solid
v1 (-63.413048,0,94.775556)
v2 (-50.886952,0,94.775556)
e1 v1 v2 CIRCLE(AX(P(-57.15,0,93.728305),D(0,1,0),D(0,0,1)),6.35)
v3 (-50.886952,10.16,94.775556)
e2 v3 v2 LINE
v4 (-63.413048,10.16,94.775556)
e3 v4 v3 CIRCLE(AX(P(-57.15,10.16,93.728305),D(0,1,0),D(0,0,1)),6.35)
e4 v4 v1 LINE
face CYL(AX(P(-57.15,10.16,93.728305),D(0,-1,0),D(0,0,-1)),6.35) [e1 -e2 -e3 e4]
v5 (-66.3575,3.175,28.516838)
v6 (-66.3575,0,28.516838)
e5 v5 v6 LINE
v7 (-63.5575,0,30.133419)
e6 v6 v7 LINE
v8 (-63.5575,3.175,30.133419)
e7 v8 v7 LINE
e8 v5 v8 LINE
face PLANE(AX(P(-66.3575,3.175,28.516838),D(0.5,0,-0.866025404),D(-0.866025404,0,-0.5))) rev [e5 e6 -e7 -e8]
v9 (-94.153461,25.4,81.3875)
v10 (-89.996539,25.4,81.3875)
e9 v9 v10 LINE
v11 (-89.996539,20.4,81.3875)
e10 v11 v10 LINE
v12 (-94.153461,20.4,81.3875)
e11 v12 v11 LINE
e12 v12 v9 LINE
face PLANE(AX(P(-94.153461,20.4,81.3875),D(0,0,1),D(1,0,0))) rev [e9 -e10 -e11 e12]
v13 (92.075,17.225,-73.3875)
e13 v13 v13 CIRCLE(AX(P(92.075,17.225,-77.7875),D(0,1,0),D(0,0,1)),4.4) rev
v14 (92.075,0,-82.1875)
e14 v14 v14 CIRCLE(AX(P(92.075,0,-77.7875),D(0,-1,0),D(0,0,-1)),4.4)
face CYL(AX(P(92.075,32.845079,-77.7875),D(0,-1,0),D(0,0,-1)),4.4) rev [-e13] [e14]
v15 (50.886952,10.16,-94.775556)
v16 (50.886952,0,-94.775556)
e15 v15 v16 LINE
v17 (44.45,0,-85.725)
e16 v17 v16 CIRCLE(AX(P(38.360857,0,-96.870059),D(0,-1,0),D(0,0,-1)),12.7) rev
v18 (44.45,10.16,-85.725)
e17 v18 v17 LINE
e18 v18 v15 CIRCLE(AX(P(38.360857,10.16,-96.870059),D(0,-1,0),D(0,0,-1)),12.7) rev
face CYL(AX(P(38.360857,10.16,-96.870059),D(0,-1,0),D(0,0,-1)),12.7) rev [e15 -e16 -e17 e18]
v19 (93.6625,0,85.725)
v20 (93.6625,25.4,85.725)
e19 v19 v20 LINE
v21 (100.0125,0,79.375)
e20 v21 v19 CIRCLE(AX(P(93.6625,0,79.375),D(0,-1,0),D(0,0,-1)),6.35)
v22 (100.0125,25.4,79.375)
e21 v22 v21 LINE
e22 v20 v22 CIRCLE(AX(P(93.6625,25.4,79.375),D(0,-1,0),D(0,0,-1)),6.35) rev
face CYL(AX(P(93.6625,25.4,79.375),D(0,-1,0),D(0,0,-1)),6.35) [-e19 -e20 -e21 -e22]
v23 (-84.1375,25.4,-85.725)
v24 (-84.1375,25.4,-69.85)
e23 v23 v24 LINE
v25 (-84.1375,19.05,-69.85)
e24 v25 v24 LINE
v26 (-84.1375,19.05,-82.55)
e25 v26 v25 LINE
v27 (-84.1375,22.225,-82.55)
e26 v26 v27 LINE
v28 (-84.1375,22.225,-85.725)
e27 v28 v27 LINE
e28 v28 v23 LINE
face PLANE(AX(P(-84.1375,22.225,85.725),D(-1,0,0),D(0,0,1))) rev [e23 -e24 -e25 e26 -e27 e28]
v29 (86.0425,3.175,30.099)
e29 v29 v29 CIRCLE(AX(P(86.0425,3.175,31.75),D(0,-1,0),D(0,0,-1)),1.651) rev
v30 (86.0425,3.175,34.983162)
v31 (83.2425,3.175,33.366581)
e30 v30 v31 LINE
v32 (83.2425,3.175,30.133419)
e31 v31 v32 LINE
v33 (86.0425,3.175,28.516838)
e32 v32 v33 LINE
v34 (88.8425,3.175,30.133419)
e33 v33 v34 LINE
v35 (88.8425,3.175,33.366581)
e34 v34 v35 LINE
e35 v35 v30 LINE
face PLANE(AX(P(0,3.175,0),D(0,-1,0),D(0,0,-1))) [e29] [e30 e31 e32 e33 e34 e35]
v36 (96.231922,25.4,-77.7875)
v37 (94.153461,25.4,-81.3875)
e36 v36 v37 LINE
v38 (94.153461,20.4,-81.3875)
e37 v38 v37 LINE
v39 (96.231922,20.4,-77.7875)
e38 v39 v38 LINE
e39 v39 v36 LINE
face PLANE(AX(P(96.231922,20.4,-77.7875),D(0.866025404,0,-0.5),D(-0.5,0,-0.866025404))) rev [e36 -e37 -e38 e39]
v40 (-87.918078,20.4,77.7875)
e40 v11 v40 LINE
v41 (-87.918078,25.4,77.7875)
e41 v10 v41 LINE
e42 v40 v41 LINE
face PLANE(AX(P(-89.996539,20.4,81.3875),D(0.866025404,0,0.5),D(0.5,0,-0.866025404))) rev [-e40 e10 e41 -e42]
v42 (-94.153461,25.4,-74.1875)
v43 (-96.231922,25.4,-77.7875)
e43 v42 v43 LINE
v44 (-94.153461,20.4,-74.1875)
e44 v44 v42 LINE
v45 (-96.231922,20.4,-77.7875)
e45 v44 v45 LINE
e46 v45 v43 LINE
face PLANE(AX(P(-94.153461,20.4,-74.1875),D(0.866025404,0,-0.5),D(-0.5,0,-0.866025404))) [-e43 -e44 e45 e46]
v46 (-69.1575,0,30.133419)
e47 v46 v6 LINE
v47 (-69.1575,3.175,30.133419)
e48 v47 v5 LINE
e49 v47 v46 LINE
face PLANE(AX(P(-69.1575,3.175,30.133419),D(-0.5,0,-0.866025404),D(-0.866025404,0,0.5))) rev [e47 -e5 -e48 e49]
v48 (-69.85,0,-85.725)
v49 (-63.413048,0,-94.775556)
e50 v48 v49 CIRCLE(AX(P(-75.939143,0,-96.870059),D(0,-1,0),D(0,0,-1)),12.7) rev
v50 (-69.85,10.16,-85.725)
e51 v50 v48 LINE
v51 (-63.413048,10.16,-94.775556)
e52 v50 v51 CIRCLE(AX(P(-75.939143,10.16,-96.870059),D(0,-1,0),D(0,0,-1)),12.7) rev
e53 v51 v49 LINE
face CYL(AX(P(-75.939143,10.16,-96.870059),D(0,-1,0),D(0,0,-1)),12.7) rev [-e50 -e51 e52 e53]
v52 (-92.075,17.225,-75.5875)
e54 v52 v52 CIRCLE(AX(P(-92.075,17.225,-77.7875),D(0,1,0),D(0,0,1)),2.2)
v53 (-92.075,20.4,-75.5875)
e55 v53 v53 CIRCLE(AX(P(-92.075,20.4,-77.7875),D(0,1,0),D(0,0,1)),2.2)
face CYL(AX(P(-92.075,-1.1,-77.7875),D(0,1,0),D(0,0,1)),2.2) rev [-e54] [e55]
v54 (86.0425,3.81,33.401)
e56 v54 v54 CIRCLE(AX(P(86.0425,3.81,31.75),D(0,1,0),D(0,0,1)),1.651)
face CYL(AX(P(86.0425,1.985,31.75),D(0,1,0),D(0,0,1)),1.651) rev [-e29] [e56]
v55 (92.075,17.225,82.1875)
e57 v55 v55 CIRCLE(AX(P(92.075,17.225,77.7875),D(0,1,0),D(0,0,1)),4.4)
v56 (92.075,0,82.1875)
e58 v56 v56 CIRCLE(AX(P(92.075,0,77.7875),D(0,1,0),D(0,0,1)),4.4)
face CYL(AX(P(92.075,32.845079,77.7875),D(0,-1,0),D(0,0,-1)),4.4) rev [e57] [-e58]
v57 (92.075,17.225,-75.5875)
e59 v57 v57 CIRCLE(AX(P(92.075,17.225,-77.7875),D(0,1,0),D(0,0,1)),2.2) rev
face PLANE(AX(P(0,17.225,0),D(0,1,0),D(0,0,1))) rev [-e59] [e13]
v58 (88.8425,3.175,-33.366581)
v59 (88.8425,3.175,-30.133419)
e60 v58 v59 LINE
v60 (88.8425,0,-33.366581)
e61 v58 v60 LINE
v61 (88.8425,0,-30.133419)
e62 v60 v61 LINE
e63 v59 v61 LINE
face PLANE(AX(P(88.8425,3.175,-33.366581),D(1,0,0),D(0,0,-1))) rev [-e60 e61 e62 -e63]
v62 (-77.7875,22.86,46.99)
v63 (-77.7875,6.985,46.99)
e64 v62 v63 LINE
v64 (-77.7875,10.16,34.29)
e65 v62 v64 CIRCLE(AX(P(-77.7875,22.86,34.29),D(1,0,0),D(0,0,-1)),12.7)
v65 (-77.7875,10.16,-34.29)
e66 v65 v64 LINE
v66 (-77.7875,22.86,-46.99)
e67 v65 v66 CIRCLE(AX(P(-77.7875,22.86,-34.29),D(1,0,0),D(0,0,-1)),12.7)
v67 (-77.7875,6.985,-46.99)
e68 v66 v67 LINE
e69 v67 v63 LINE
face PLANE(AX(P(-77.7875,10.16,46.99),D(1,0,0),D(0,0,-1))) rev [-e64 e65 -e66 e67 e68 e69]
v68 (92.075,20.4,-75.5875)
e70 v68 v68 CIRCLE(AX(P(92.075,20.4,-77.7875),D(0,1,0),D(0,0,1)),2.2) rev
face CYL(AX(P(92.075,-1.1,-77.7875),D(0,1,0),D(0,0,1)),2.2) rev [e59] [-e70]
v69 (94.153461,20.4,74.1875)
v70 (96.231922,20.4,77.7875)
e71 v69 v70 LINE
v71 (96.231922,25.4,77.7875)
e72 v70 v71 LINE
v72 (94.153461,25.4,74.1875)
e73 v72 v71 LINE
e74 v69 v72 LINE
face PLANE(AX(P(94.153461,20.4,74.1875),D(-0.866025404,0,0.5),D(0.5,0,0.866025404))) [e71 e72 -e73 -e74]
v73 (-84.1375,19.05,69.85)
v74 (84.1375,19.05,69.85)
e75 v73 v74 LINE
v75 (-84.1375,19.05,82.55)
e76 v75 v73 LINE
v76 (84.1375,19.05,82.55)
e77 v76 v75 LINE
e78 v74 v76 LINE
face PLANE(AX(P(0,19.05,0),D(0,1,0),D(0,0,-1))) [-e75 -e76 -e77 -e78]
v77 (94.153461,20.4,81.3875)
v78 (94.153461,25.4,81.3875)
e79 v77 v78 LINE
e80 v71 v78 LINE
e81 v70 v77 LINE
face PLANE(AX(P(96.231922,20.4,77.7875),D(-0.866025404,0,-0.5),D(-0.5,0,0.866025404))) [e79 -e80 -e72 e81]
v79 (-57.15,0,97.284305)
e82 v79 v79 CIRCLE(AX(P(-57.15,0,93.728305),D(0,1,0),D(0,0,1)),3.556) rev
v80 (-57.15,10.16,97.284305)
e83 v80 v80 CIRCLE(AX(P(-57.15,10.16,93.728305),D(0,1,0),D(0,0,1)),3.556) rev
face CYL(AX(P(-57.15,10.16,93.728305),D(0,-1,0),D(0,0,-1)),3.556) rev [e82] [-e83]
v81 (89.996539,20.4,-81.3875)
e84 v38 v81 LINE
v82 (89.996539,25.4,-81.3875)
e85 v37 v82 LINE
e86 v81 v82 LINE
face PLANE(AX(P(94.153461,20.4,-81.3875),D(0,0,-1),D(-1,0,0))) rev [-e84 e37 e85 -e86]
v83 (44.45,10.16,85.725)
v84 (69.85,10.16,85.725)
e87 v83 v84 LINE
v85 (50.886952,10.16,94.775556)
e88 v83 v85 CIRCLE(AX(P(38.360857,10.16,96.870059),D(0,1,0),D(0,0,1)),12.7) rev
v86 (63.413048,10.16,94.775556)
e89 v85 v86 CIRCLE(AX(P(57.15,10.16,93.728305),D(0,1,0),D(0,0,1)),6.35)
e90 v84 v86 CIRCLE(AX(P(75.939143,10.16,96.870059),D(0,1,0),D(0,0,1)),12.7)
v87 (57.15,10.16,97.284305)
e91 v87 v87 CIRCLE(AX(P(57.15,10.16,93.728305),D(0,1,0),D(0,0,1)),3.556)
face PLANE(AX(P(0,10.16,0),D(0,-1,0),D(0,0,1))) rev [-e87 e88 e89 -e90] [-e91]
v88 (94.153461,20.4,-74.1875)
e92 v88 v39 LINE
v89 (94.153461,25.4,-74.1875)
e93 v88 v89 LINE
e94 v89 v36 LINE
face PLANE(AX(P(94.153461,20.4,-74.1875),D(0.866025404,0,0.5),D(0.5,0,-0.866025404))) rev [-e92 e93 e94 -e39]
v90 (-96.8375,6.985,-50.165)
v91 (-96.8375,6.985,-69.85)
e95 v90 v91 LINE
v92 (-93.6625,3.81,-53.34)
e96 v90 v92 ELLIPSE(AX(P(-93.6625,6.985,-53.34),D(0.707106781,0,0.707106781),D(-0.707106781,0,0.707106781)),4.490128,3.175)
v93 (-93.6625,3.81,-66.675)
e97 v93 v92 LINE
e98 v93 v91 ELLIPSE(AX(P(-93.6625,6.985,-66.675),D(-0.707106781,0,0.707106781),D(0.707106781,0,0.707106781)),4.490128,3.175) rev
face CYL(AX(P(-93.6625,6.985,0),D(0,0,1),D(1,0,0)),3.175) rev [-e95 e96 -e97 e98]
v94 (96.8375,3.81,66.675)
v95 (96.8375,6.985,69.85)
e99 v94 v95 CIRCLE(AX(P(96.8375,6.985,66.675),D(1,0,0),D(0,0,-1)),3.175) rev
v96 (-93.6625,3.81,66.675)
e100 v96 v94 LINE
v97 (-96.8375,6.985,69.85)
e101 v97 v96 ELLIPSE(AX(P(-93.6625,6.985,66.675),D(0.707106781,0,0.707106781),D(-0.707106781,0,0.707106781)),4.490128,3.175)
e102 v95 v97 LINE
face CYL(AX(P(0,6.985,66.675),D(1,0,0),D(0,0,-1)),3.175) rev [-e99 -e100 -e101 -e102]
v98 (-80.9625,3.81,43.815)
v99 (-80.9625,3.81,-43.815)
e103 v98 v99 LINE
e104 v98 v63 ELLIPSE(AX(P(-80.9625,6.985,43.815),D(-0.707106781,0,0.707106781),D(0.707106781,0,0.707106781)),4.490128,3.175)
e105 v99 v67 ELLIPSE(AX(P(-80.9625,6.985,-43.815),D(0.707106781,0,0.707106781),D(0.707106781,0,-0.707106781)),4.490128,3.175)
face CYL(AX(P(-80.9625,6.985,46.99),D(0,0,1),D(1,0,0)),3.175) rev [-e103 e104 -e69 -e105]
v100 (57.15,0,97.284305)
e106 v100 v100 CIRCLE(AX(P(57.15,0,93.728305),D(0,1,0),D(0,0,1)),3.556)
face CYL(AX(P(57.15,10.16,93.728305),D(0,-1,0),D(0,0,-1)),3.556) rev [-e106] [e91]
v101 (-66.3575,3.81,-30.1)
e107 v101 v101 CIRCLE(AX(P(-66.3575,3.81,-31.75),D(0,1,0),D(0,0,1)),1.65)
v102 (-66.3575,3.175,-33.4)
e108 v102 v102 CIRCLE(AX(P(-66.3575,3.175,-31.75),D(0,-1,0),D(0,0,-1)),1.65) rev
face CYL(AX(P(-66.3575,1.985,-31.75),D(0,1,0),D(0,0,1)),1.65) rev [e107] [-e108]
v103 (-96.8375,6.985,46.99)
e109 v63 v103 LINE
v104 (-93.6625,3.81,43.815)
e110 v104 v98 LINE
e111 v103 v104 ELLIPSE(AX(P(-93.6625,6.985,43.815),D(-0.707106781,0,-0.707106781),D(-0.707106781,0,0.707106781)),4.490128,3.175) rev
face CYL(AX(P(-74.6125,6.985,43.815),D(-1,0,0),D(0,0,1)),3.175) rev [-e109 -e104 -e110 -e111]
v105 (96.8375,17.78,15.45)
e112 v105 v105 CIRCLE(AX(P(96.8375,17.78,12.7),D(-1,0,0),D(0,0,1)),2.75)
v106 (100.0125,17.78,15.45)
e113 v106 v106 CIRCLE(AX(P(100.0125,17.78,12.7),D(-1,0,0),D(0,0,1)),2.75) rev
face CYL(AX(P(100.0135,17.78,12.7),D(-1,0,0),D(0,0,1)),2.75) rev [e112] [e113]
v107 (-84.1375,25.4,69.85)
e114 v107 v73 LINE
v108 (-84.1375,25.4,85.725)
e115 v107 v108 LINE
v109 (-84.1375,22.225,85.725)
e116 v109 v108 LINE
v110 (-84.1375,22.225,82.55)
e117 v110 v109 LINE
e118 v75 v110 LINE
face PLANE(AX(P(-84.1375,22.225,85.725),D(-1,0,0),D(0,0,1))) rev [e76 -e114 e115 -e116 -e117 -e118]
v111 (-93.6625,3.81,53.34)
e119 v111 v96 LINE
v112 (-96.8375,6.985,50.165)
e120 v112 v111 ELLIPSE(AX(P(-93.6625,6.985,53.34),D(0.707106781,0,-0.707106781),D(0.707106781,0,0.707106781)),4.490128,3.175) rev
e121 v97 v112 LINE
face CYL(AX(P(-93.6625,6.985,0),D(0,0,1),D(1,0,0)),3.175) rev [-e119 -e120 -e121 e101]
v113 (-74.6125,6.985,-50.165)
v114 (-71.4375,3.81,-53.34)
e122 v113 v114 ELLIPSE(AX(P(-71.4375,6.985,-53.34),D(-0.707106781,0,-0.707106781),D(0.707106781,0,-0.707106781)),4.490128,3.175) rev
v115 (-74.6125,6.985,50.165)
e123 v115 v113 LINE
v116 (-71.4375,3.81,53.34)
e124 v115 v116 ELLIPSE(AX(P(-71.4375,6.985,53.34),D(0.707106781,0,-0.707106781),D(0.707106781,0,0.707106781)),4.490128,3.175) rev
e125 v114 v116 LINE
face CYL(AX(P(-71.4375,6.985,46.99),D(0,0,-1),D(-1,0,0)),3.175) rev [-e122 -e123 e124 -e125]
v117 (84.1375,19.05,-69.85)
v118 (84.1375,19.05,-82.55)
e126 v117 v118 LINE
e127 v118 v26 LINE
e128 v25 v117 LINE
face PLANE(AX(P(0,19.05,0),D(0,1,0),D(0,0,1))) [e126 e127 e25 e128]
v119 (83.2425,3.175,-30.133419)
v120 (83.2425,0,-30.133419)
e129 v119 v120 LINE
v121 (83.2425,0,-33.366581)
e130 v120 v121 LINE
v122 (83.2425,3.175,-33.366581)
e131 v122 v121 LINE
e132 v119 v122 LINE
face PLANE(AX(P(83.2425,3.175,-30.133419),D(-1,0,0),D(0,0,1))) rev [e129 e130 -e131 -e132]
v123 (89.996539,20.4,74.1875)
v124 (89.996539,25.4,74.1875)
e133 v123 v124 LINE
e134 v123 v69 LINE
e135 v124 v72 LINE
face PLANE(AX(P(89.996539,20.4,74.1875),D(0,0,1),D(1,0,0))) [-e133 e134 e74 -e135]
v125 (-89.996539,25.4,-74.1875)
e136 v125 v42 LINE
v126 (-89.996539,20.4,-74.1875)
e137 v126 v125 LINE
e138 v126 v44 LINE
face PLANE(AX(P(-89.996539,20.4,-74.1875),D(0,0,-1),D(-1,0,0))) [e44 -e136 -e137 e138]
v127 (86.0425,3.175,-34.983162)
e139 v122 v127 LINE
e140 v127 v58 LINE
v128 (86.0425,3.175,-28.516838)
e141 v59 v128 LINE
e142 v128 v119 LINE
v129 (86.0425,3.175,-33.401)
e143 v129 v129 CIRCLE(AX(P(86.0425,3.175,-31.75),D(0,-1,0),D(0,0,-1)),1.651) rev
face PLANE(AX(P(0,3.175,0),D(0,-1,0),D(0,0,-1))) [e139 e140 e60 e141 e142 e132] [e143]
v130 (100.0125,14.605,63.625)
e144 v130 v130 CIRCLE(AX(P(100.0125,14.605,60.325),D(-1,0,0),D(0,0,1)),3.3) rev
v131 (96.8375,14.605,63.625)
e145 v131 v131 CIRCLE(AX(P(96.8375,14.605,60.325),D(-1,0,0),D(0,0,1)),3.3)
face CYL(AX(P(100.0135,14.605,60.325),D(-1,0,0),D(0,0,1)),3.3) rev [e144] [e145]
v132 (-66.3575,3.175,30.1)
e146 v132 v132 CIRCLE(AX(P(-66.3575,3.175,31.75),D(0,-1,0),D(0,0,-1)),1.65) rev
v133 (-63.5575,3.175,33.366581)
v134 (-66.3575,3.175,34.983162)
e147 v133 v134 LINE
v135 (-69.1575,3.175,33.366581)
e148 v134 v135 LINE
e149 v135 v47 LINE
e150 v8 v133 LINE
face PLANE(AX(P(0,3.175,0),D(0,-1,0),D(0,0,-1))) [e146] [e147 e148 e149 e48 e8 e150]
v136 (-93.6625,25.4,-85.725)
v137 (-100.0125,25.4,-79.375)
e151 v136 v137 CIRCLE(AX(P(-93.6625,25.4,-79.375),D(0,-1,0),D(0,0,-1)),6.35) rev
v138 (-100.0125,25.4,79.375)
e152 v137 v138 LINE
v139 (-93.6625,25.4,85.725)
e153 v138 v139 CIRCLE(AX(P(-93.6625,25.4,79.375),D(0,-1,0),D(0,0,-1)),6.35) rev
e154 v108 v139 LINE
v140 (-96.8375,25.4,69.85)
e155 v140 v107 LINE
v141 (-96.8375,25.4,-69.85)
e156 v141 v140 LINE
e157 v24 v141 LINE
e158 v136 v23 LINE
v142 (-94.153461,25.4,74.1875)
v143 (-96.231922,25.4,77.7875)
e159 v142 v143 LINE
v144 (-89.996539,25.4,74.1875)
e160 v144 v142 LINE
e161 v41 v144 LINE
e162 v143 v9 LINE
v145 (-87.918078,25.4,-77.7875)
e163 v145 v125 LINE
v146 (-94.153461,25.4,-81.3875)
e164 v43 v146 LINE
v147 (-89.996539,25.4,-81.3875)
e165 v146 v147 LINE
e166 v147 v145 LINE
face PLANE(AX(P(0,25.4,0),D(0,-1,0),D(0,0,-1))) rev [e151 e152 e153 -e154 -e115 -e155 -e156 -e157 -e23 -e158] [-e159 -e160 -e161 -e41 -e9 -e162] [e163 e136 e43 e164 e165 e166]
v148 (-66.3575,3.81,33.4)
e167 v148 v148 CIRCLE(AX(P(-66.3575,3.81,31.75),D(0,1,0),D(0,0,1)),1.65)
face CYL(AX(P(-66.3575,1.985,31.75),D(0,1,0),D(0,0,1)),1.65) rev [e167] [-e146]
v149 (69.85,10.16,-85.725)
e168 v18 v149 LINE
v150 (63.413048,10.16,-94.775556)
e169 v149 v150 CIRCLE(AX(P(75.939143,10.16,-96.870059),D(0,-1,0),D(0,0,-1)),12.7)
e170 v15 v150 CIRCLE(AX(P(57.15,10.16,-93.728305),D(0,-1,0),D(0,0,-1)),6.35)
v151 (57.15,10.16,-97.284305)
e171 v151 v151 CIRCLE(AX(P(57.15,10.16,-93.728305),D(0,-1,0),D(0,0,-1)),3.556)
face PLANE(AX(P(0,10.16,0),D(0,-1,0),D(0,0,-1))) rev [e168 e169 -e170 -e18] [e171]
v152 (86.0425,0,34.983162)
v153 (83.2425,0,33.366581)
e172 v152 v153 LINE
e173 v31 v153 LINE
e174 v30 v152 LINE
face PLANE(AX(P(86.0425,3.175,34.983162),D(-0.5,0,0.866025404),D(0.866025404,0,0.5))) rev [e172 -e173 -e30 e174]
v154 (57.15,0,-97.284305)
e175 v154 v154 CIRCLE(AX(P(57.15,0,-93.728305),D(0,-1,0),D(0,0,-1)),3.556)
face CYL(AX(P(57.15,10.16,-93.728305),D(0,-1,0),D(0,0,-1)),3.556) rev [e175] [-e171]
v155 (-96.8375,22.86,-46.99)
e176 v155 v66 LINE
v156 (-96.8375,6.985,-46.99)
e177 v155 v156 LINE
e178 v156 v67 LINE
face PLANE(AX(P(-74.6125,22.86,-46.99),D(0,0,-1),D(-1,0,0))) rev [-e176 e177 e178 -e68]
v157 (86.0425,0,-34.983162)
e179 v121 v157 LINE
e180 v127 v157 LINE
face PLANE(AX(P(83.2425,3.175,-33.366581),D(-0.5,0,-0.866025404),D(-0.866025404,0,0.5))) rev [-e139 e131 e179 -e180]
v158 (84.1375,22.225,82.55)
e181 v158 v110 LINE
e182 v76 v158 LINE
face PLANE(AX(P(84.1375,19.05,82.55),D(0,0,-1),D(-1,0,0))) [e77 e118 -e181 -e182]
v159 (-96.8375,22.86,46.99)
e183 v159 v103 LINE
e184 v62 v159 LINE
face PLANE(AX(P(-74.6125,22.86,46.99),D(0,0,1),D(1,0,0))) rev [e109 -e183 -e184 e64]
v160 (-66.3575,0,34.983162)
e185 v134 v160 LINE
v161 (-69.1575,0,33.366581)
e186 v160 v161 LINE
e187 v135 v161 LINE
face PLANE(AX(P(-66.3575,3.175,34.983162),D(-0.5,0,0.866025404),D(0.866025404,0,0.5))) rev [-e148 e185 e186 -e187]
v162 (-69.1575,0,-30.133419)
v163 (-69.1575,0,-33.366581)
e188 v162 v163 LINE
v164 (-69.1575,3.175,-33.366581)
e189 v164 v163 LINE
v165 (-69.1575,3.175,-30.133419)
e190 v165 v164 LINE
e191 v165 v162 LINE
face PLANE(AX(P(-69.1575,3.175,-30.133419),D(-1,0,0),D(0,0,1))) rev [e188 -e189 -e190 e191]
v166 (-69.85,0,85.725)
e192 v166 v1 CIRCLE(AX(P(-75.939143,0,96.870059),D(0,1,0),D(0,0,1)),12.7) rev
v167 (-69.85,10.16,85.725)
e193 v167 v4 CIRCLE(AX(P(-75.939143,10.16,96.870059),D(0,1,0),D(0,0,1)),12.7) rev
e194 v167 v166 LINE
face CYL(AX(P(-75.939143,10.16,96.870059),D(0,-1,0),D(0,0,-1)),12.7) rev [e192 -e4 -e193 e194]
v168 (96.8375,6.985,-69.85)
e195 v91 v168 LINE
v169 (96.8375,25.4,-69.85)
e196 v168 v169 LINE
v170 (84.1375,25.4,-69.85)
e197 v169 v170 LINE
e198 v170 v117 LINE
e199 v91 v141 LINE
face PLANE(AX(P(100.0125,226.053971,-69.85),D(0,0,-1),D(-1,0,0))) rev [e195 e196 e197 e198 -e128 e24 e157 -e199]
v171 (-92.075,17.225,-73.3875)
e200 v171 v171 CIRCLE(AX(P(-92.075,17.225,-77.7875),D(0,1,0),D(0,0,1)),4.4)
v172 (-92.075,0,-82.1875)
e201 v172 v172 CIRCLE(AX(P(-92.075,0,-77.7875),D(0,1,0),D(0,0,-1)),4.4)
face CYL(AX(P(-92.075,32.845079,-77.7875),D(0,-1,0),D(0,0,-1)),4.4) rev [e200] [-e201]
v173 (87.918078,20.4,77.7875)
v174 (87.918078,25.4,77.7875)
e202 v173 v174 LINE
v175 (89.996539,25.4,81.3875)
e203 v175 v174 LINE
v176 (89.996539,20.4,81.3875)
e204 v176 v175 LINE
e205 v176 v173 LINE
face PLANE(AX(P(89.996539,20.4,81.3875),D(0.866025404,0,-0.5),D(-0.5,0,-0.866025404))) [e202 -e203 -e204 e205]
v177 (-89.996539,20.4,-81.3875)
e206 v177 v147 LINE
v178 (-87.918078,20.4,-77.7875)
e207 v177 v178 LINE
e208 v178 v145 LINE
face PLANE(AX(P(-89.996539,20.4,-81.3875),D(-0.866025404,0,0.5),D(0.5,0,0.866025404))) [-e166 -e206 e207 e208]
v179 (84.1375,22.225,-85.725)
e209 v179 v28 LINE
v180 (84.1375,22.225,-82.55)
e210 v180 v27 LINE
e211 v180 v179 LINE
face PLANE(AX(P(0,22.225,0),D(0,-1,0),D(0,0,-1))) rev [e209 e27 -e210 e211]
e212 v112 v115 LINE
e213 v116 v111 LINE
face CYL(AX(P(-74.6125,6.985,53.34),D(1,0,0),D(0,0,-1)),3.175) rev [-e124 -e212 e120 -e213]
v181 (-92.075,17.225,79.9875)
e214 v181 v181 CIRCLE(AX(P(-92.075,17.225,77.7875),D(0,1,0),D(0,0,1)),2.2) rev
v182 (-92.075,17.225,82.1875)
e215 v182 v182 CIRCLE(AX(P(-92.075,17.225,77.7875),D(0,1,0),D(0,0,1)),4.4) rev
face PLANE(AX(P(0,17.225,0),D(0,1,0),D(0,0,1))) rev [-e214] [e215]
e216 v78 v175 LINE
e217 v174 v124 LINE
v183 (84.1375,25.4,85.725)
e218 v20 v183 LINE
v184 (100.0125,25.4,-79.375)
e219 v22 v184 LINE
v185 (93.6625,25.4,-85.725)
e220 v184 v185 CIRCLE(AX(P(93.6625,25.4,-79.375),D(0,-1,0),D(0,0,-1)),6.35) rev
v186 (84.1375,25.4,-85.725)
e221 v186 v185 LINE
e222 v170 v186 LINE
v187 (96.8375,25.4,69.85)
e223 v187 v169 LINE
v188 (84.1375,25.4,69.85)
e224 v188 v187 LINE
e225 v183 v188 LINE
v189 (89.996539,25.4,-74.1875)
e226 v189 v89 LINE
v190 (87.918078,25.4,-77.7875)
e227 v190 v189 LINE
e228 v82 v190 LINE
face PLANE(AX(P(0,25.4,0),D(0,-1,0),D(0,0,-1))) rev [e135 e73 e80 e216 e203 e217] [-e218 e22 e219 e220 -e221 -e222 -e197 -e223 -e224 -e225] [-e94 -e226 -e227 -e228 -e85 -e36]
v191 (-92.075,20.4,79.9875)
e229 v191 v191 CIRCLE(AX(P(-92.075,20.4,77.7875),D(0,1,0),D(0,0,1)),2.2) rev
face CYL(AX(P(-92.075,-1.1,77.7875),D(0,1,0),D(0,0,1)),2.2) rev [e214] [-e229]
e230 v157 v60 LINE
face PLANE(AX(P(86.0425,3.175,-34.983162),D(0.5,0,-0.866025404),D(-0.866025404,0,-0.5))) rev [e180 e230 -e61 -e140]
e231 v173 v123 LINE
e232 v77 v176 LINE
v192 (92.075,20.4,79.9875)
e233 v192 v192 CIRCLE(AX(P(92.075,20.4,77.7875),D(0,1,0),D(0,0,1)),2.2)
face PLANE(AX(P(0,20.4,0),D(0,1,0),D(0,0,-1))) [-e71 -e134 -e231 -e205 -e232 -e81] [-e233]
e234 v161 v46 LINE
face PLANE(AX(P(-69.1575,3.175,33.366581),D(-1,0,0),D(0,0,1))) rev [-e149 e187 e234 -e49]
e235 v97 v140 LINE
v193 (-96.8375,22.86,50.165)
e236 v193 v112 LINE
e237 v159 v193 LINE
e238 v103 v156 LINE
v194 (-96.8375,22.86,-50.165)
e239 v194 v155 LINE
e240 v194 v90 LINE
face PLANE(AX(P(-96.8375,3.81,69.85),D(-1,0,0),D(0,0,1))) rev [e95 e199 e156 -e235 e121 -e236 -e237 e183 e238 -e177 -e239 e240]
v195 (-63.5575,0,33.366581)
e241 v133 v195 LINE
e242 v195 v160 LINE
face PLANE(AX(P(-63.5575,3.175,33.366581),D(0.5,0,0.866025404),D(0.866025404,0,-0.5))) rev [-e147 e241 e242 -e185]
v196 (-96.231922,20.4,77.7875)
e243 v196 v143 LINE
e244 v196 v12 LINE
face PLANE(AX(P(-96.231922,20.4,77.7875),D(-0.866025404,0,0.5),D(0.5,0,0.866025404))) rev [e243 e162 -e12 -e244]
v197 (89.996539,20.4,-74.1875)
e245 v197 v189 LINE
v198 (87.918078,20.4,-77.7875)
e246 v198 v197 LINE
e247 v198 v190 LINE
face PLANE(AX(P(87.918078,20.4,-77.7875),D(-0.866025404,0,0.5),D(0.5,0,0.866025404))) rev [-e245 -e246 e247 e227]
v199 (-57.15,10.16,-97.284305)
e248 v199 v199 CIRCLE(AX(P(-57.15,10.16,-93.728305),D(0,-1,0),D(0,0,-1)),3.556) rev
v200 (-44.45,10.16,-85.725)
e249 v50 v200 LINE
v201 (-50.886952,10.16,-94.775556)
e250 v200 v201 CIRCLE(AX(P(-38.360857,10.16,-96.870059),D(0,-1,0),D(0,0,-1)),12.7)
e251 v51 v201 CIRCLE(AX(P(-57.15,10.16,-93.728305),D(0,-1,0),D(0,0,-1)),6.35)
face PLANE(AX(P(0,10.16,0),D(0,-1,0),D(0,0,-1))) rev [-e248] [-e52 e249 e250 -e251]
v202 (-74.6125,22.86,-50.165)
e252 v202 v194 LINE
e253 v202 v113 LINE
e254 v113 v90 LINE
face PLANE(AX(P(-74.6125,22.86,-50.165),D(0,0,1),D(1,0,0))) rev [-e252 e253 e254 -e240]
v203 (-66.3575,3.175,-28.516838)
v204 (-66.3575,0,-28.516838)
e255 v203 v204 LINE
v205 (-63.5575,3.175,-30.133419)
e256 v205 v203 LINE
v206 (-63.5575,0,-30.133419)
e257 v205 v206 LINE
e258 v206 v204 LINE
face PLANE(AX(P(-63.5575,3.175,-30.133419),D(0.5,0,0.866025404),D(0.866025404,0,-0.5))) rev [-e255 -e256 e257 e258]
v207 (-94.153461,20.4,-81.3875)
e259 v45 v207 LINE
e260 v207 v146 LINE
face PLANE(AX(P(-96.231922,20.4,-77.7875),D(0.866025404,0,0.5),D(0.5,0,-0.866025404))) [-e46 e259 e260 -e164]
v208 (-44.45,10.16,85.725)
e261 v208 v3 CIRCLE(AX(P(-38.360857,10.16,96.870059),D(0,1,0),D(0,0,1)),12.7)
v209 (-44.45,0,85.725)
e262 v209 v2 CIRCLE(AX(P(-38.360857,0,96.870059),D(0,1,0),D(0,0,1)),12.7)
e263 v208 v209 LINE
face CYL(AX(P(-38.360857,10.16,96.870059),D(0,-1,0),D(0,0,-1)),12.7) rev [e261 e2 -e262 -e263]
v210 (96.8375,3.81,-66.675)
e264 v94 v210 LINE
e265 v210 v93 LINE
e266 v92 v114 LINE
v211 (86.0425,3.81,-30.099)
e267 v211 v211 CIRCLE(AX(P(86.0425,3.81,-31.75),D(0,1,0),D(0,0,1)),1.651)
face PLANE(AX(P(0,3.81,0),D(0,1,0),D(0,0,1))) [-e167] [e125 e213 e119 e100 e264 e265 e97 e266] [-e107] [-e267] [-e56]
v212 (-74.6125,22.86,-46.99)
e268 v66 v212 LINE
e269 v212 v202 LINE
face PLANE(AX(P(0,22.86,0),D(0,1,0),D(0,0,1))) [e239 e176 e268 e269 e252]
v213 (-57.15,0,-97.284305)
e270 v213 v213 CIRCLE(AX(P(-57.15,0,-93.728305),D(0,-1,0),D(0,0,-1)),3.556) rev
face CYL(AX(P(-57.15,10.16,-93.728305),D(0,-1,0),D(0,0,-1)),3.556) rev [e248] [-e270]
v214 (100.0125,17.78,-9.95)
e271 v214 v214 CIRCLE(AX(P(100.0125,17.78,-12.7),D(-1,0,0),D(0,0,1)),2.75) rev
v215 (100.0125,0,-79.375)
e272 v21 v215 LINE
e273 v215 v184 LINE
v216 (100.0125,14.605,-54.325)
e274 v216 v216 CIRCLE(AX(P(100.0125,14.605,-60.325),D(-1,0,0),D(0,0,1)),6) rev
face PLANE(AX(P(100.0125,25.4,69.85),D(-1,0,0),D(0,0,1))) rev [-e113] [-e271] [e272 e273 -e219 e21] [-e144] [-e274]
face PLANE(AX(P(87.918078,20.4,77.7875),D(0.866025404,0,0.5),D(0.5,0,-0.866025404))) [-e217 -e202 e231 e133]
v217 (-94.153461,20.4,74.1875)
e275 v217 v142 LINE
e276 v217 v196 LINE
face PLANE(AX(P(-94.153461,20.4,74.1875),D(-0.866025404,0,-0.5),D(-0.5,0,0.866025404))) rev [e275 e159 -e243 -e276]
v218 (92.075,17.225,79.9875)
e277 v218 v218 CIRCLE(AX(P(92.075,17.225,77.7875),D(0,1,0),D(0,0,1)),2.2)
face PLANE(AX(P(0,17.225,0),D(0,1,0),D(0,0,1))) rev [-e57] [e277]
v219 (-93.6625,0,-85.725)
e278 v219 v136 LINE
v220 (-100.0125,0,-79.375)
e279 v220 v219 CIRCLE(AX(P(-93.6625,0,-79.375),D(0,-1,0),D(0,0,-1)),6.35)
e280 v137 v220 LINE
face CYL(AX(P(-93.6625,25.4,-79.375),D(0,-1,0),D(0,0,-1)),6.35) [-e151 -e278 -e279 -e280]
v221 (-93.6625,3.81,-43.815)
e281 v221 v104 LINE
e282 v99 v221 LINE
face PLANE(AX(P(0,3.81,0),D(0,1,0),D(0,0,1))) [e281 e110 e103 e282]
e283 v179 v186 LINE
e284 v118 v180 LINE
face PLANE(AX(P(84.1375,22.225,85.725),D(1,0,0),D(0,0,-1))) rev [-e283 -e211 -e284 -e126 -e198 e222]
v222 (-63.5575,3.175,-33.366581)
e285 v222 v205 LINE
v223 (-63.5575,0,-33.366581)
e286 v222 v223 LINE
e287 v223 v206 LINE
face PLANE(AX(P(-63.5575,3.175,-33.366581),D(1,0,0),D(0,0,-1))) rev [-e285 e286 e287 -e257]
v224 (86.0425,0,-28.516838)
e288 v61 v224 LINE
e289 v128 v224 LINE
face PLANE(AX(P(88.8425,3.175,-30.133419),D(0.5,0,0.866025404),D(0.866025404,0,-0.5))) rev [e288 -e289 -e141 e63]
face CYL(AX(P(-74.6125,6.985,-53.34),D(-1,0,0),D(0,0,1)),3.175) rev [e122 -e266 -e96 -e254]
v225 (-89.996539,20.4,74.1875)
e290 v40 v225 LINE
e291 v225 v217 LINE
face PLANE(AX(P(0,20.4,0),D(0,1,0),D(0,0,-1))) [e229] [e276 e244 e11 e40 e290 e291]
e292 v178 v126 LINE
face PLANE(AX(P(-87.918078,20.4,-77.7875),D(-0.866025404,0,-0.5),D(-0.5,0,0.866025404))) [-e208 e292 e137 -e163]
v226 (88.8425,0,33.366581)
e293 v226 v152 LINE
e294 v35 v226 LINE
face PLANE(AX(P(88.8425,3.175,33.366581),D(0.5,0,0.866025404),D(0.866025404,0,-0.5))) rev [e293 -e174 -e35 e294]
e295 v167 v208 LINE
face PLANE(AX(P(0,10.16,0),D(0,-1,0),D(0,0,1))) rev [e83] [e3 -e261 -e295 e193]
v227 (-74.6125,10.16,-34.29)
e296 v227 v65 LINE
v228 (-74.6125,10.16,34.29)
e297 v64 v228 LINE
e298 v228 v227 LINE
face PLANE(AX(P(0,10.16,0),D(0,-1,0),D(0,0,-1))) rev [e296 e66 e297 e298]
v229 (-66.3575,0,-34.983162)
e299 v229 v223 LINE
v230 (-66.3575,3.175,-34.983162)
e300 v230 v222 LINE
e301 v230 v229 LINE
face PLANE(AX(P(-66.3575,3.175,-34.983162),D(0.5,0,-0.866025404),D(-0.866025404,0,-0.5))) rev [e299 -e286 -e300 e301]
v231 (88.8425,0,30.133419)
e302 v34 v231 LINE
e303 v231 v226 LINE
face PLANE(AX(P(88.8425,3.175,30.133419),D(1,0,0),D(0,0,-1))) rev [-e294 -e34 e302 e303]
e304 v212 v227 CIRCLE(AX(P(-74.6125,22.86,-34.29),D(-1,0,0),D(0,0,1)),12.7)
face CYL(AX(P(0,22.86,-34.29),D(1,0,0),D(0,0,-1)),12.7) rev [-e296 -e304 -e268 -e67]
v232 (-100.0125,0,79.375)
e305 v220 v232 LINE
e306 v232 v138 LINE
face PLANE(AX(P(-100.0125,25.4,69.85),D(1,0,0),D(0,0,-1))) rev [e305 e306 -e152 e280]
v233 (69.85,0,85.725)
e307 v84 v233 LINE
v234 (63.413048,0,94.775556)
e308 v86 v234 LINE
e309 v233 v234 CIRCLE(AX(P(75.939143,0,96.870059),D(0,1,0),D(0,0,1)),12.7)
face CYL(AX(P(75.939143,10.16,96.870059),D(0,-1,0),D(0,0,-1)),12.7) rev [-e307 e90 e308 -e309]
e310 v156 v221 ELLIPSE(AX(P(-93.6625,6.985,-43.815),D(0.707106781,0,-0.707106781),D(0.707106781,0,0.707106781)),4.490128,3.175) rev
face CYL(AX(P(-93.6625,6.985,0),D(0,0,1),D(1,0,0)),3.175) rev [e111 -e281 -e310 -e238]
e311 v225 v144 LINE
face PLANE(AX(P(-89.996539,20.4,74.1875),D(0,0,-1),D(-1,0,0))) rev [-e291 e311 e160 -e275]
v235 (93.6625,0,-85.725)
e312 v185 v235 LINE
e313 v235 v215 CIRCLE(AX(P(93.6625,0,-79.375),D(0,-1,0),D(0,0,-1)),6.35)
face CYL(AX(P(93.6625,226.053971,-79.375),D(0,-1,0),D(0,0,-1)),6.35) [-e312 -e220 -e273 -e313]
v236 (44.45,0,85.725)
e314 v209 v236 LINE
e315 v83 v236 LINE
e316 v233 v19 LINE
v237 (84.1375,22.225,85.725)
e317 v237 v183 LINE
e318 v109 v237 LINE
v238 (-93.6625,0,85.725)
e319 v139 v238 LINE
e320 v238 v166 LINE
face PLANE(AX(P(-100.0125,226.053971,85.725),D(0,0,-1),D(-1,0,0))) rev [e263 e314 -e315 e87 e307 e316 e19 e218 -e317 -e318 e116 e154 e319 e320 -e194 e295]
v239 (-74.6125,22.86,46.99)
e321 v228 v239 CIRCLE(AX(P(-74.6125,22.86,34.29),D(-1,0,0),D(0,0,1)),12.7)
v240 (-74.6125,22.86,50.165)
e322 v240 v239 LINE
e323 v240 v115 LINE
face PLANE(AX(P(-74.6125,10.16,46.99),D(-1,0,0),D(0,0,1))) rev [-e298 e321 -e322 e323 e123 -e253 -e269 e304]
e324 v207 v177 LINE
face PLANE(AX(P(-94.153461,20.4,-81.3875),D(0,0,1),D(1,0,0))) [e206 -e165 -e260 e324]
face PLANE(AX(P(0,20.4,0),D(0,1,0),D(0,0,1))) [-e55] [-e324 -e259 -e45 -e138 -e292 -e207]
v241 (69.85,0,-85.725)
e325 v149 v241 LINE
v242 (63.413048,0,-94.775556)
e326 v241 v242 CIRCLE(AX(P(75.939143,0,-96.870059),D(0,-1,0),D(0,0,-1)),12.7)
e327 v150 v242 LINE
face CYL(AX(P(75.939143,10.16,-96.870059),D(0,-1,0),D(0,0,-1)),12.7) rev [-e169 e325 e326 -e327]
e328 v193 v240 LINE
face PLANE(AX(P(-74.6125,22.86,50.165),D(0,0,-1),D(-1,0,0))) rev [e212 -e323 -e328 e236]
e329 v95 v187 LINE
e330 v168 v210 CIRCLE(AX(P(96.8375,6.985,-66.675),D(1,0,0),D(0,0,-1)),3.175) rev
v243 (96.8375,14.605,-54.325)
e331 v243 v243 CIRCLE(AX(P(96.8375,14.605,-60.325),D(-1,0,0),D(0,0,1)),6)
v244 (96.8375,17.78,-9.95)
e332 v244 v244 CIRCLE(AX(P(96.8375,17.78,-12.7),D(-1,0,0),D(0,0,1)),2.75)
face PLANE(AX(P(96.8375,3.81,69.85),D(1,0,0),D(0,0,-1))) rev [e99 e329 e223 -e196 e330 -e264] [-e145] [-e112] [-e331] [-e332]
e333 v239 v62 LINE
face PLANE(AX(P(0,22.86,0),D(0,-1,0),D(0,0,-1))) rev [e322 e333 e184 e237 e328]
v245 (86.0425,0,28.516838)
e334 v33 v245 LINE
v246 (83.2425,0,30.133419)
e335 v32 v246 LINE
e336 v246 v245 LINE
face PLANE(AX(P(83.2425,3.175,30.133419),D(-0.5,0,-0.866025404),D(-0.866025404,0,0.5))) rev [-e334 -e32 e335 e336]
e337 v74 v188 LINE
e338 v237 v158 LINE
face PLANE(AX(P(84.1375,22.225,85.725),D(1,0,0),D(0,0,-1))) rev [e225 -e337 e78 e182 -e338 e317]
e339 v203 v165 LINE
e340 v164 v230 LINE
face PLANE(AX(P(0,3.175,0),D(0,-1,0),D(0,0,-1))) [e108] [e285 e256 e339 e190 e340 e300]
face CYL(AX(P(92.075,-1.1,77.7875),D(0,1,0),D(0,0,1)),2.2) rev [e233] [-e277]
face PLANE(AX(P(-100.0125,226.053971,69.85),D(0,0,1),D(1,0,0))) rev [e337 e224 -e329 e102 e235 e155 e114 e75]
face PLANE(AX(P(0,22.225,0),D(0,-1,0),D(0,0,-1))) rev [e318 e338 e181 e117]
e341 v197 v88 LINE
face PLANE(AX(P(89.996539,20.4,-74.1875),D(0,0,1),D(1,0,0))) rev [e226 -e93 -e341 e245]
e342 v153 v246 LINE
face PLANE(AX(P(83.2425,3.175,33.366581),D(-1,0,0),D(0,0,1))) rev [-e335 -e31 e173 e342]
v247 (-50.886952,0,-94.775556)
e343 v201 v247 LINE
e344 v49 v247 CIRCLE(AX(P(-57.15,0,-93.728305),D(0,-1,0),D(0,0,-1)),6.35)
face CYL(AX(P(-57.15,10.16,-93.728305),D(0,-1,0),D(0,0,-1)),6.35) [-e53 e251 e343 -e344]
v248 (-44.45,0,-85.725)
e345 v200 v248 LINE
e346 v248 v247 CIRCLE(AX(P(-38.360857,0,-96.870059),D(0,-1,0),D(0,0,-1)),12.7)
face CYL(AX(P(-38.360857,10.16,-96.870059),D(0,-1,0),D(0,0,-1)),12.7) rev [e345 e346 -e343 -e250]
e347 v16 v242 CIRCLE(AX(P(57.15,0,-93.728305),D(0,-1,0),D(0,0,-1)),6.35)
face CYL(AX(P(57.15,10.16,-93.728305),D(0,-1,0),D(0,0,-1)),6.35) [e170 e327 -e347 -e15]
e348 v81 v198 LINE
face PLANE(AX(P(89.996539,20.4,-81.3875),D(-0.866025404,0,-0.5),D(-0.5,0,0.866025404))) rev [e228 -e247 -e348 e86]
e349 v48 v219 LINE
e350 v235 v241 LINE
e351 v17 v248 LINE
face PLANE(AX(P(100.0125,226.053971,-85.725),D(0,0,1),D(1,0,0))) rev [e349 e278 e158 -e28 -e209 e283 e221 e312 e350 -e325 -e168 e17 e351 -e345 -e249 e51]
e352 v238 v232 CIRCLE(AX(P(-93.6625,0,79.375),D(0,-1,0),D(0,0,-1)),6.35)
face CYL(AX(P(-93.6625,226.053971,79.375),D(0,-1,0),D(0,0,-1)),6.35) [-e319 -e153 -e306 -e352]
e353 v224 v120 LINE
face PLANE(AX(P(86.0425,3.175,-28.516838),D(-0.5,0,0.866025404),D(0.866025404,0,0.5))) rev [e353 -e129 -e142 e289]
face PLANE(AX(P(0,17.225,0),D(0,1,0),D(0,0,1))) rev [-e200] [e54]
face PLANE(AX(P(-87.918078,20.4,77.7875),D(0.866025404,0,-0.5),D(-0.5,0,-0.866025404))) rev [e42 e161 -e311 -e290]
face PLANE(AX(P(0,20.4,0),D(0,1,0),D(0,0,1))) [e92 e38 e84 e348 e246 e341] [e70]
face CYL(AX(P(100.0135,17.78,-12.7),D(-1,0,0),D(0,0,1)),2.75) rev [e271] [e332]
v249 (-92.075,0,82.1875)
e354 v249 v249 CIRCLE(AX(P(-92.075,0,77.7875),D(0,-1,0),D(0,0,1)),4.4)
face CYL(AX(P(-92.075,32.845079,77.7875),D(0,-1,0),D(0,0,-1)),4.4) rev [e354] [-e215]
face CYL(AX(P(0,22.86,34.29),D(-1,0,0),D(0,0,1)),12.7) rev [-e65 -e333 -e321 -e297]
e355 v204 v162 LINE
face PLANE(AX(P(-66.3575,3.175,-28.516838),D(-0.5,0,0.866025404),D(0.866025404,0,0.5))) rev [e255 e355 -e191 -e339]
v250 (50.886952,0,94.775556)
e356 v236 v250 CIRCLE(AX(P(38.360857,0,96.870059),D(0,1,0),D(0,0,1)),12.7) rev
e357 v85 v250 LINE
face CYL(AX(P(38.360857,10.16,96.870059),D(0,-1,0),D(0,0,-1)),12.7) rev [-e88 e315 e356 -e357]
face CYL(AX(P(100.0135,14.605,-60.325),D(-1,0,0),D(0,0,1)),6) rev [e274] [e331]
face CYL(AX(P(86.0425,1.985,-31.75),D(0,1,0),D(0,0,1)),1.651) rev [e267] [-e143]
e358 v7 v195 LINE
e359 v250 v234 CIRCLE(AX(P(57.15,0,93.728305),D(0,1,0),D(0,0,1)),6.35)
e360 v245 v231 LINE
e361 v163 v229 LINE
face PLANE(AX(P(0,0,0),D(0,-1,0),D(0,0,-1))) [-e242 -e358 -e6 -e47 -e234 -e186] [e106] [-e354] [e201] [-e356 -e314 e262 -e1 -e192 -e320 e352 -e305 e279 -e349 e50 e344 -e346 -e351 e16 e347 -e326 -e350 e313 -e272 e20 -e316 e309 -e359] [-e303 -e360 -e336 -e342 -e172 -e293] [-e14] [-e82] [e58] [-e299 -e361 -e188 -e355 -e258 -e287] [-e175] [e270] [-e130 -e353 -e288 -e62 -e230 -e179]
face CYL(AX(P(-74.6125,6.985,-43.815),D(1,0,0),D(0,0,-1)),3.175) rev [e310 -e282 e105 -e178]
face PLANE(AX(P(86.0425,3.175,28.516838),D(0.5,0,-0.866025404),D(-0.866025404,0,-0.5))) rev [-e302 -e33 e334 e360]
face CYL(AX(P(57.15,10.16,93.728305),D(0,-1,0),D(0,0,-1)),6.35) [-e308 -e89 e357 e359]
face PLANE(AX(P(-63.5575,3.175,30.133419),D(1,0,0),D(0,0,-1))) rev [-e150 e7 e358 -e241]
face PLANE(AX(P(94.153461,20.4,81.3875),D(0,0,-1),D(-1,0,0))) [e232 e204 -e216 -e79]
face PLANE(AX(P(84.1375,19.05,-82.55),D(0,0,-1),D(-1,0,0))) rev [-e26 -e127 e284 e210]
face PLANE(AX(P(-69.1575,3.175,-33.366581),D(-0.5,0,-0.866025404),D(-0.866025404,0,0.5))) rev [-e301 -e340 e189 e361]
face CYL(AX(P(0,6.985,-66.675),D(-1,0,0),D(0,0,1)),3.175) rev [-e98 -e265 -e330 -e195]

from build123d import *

# Parameters (mm, degrees)
SKETCH18_W              = 200.025
SKETCH18_H              = 139.7
BOSS_EXTRUDE6_DEPTH     = 25.4
SKETCH20_W              = 193.675
SKETCH20_H              = 139.7
CUT_EXTRUDE6_DEPTH      = 21.59
SKETCH22_W              = 200.025
SKETCH22_H              = 15.875
BOSS_EXTRUDE7_DEPTH     = 25.4
SKETCH23_W              = 200.025
SKETCH23_H              = 15.875
BOSS_EXTRUDE8_DEPTH     = 25.4
SKETCH24_W              = 168.275
SKETCH24_H              = 171.45
CUT_EXTRUDE7_DEPTH      = 3.175
SKETCH28_W              = 168.275
SKETCH28_H              = 12.7
CUT_EXTRUDE10_DEPTH     = 3.175
SKETCH31_R              = 1.65
SKETCH31_R_2            = 1.651
CUT_EXTRUDE15_DEPTH     = 1.825
CUT_EXTRUDE17_DEPTH     = 3.175
SKETCH39_R              = 2.2
CUT_EXTRUDE18_DEPTH     = 26.5
CUT_EXTRUDE20_DEPTH     = 5
SKETCH40_R              = 4.4
CUT_EXTRUDE19_DEPTH     = 17.225
SKETCH47_R              = 3.556
BOSS_EXTRUDE14_DEPTH    = 10.16
MIRROR6_COPY_1_SKETCH_R = 2.2
MIRROR6_COPY_1_DEPTH    = 26.5
MIRROR6_COPY_2_DEPTH    = 5
MIRROR6_COPY_3_SKETCH_R = 4.4
MIRROR6_COPY_3_DEPTH    = 17.225
CUT_EXTRUDE21_REACH     = 224.285
SKETCH48_R              = 6
SKETCH48_R_2            = 3.3
SKETCH48_R_3            = 2.75
SKETCH49_W              = 3.175
SKETCH49_H              = 93.98
BOSS_EXTRUDE15_DEPTH    = 6.35
SKETCH50_W              = 22.225
SKETCH50_H              = 3.175
BOSS_EXTRUDE16_DEPTH    = 19.05
FILLET1_R               = 6.35
FILLET2_R               = 3.175
FILLET3_R               = 12.7


with BuildPart() as part:
    # Sketch18 → Boss-Extrude6 (new body)
    with BuildSketch(Plane(origin=(0, 0, 0), x_dir=(1, 0, 0), z_dir=(0, 1, 0))):
        Rectangle(SKETCH18_W, SKETCH18_H)
    extrude(amount=BOSS_EXTRUDE6_DEPTH)

    # Sketch20 → Cut-Extrude6 (cut)
    with BuildSketch(Plane(origin=(0, 25.4, 0), x_dir=(1, 0, 0), z_dir=(0, 1, 0))):
        Rectangle(SKETCH20_W, SKETCH20_H)
    extrude(amount=-CUT_EXTRUDE6_DEPTH, mode=Mode.SUBTRACT)

    # Sketch22 → Boss-Extrude7 (add)
    with BuildSketch(Plane(origin=(0, 0, 0), x_dir=(1, 0, 0), z_dir=(0, 1, 0))):
        with Locations((0, -77.7875)):
            Rectangle(SKETCH22_W, SKETCH22_H)
    extrude(amount=BOSS_EXTRUDE7_DEPTH)

    # Sketch23 → Boss-Extrude8 (add)
    with BuildSketch(Plane(origin=(0, 0, 0), x_dir=(1, 0, 0), z_dir=(0, 1, 0))):
        with Locations((0, 77.7875)):
            Rectangle(SKETCH23_W, SKETCH23_H)
    extrude(amount=BOSS_EXTRUDE8_DEPTH)

    # Sketch24 → Cut-Extrude7 (cut)
    with BuildSketch(Plane(origin=(0, 25.4, 0), x_dir=(1, 0, 0), z_dir=(0, 1, 0))):
        Rectangle(SKETCH24_W, SKETCH24_H)
    extrude(amount=-CUT_EXTRUDE7_DEPTH, mode=Mode.SUBTRACT)

    # Sketch28 → Cut-Extrude10 (cut)
    with BuildSketch(Plane(origin=(0, 22.225, 0), x_dir=(1, 0, 0), z_dir=(0, 1, 0))):
        with Locations((0, 76.2)):
            Rectangle(SKETCH28_W, SKETCH28_H)
    cut_extrude10 = extrude(amount=-CUT_EXTRUDE10_DEPTH, mode=Mode.SUBTRACT)

    # Mirror5: Cut-Extrude10 across plane
    add(cut_extrude10.mirror(Plane.XY), mode=Mode.SUBTRACT)

    # Sketch31 → Cut-Extrude15 (cut)
    with BuildSketch(Plane(origin=(0, 3.81, 0), x_dir=(1, 0, 0), z_dir=(0, 1, 0))):
        with Locations(Location((-66.3575, 31.75, 0), (0, 0, 270))):
            Circle(SKETCH31_R)
        with Locations(Location((86.0425, 31.75, 0), (0, 0, 270))):
            Circle(SKETCH31_R_2)
        with Locations(Location((86.0425, -31.75, 0), (0, 0, 270))):
            Circle(SKETCH31_R_2)
        with Locations(Location((-66.3575, -31.75, 0), (0, 0, 270))):
            Circle(SKETCH31_R)
    extrude(amount=-CUT_EXTRUDE15_DEPTH, mode=Mode.SUBTRACT)

    # Sketch33 → Cut-Extrude17 (cut)
    with BuildSketch(Plane.XZ):
        Polygon((-63.5575, -33.366580754), (-63.5575, -30.133419246), (-66.3575, -28.516838493), (-69.1575, -30.133419246), (-69.1575, -33.366580754), (-66.3575, -34.983161507), align=None)
        Polygon((88.8425, -33.366580754), (88.8425, -30.133419246), (86.0425, -28.516838493), (83.2425, -30.133419246), (83.2425, -33.366580754), (86.0425, -34.983161507), align=None)
        Polygon((-63.5575, 33.366580754), (-66.3575, 34.983161507), (-69.1575, 33.366580754), (-69.1575, 30.133419246), (-66.3575, 28.516838493), (-63.5575, 30.133419246), align=None)
        Polygon((83.2425, 33.366580754), (83.2425, 30.133419246), (86.0425, 28.516838493), (88.8425, 30.133419246), (88.8425, 33.366580754), (86.0425, 34.983161507), align=None)
    extrude(amount=-CUT_EXTRUDE17_DEPTH, mode=Mode.SUBTRACT)

    # Sketch39 → Cut-Extrude18 (cut)
    with BuildSketch(Plane(origin=(0, 25.4, 0), x_dir=(1, 0, 0), z_dir=(0, 1, 0))):
        with Locations(Location((92.075, 77.7875, 0), (0, 0, 270))):
            Circle(SKETCH39_R)
    cut_extrude18 = extrude(amount=-CUT_EXTRUDE18_DEPTH, mode=Mode.SUBTRACT)

    # Sketch41 → Cut-Extrude20 (cut)
    with BuildSketch(Plane(origin=(0, 25.4, 0), x_dir=(1, 0, 0), z_dir=(0, 1, 0))):
        Polygon((89.996539031, 81.3875), (87.918078062, 77.7875), (89.996539031, 74.1875), (94.153460969, 74.1875), (96.231921938, 77.7875), (94.153460969, 81.3875), align=None)
    cut_extrude20 = extrude(amount=-CUT_EXTRUDE20_DEPTH, mode=Mode.SUBTRACT)

    # Sketch40 → Cut-Extrude19 (cut)
    with BuildSketch(Plane.XZ):
        with Locations(Location((92.075, -77.7875, 0), (0, 0, 270))):
            Circle(SKETCH40_R)
    cut_extrude19 = extrude(amount=-CUT_EXTRUDE19_DEPTH, mode=Mode.SUBTRACT)

    # Mirror3: Cut-Extrude18, Cut-Extrude20, Cut-Extrude19 across plane
    add(cut_extrude18.mirror(Plane.XY), mode=Mode.SUBTRACT)
    add(cut_extrude20.mirror(Plane.XY), mode=Mode.SUBTRACT)
    add(cut_extrude19.mirror(Plane.XY), mode=Mode.SUBTRACT)

    # Sketch47 → Boss-Extrude14 (add)
    # profile 1 of 2: a face of its own
    with BuildSketch(Plane.XZ):
        with BuildLine():
            Line((-44.45, -85.725), (-69.85, -85.725))
            ThreePointArc((-69.85, -85.725), (-65.589750808, -89.50934655), (-63.41304754, -94.775556275))
            ThreePointArc((-63.41304754, -94.775556275), (-61.253197141, -98.574568708), (-57.15, -100.078304866))
            ThreePointArc((-57.15, -100.078304866), (-53.046802859, -98.574568708), (-50.88695246, -94.775556275))
            ThreePointArc((-50.88695246, -94.775556275), (-48.710249192, -89.50934655), (-44.45, -85.725))
        make_face()
        with Locations(Location((-57.15, -93.728304866, 0), (0, 0, 270))):
            Circle(SKETCH47_R, mode=Mode.SUBTRACT)
    # profile 2 of 2: a face of its own
    with BuildSketch(Plane.XZ):
        with BuildLine():
            Line((69.85, -85.725), (44.45, -85.725))
            ThreePointArc((44.45, -85.725), (48.710249192, -89.50934655), (50.88695246, -94.775556275))
            ThreePointArc((50.88695246, -94.775556275), (53.046802859, -98.574568708), (57.15, -100.078304866))
            ThreePointArc((57.15, -100.078304866), (61.253197141, -98.574568708), (63.41304754, -94.775556275))
            ThreePointArc((63.41304754, -94.775556275), (65.589750808, -89.50934655), (69.85, -85.725))
        make_face()
        with Locations(Location((57.15, -93.728304866, 0), (0, 0, 270))):
            Circle(SKETCH47_R, mode=Mode.SUBTRACT)
    boss_extrude14 = extrude(amount=-BOSS_EXTRUDE14_DEPTH)

    # Mirror4: Boss-Extrude14 across plane
    add(boss_extrude14.mirror(Plane.XY))

    # Mirror6: Cut-Extrude18, Cut-Extrude20, Cut-Extrude19 across plane
    add(cut_extrude18.mirror(Plane(origin=(0, 0, 0), x_dir=(0, 0, 1), z_dir=(1, 0, 0))), mode=Mode.SUBTRACT)
    add(cut_extrude20.mirror(Plane(origin=(0, 0, 0), x_dir=(0, 0, 1), z_dir=(1, 0, 0))), mode=Mode.SUBTRACT)
    add(cut_extrude19.mirror(Plane(origin=(0, 0, 0), x_dir=(0, 0, 1), z_dir=(1, 0, 0))), mode=Mode.SUBTRACT)

    # Mirror6 copy 1 sketch → Mirror6 copy 1 (cut)
    with BuildSketch(Plane(origin=(0, 25.4, 0), x_dir=(-1, 0, 0), z_dir=(0, 1, 0))):
        with Locations(Location((92.075, 77.7875, 0), (0, 0, 270))):
            Circle(MIRROR6_COPY_1_SKETCH_R)
    extrude(amount=-MIRROR6_COPY_1_DEPTH, mode=Mode.SUBTRACT)

    # Mirror6 copy 2 sketch → Mirror6 copy 2 (cut)
    with BuildSketch(Plane(origin=(0, 25.4, 0), x_dir=(-1, 0, 0), z_dir=(0, 1, 0))):
        Polygon((89.996539031, 81.3875), (87.918078062, 77.7875), (89.996539031, 74.1875), (94.153460969, 74.1875), (96.231921938, 77.7875), (94.153460969, 81.3875), align=None)
    extrude(amount=-MIRROR6_COPY_2_DEPTH, mode=Mode.SUBTRACT)

    # Mirror6 copy 3 sketch → Mirror6 copy 3 (cut)
    with BuildSketch(Plane(origin=(0, 0, 0), x_dir=(-1, 0, 0), z_dir=(0, -1, 0))):
        with Locations(Location((92.075, -77.7875, 0), (0, 0, 270))):
            Circle(MIRROR6_COPY_3_SKETCH_R)
    extrude(amount=-MIRROR6_COPY_3_DEPTH, mode=Mode.SUBTRACT)

    # Sketch48 → Cut-Extrude21 (cut, up to next)
    with BuildSketch(Plane.ZY.offset(-96.8375), mode=Mode.PRIVATE) as cut_extrude21_sk1:
        with Locations((-60.325, 14.605)):
            Circle(SKETCH48_R)
    cut_extrude21_tool1 = extrude(cut_extrude21_sk1.sketch, amount=-CUT_EXTRUDE21_REACH, mode=Mode.PRIVATE) & part.part
    # Sketch48 → Cut-Extrude21 (cut, up to next)
    with BuildSketch(Plane.ZY.offset(-96.8375), mode=Mode.PRIVATE) as cut_extrude21_sk2:
        with Locations((60.325, 14.605)):
            Circle(SKETCH48_R_2)
    cut_extrude21_tool2 = extrude(cut_extrude21_sk2.sketch, amount=-CUT_EXTRUDE21_REACH, mode=Mode.PRIVATE) & part.part
    # Sketch48 → Cut-Extrude21 (cut, up to next)
    with BuildSketch(Plane.ZY.offset(-96.8375), mode=Mode.PRIVATE) as cut_extrude21_sk3:
        with Locations((-12.7, 17.78)):
            Circle(SKETCH48_R_3)
    cut_extrude21_tool3 = extrude(cut_extrude21_sk3.sketch, amount=-CUT_EXTRUDE21_REACH, mode=Mode.PRIVATE) & part.part
    # Sketch48 → Cut-Extrude21 (cut, up to next)
    with BuildSketch(Plane.ZY.offset(-96.8375), mode=Mode.PRIVATE) as cut_extrude21_sk4:
        with Locations((12.7, 17.78)):
            Circle(SKETCH48_R_3)
    cut_extrude21_tool4 = extrude(cut_extrude21_sk4.sketch, amount=-CUT_EXTRUDE21_REACH, mode=Mode.PRIVATE) & part.part
    add(cut_extrude21_tool1.solids().sort_by_distance((96.8375, 14.605, -60.325))[0], mode=Mode.SUBTRACT)
    add(cut_extrude21_tool2.solids().sort_by_distance((96.8375, 14.605, 60.325))[0], mode=Mode.SUBTRACT)
    add(cut_extrude21_tool3.solids().sort_by_distance((96.8375, 17.78, -12.7))[0], mode=Mode.SUBTRACT)
    add(cut_extrude21_tool4.solids().sort_by_distance((96.8375, 17.78, 12.7))[0], mode=Mode.SUBTRACT)

    # Sketch49 → Boss-Extrude15 (add)
    with BuildSketch(Plane(origin=(0, 3.81, 0), x_dir=(1, 0, 0), z_dir=(0, 1, 0))):
        with Locations((-76.2, 0)):
            Rectangle(SKETCH49_W, SKETCH49_H)
    extrude(amount=BOSS_EXTRUDE15_DEPTH)

    # Sketch50 → Boss-Extrude16 (add)
    with BuildSketch(Plane(origin=(0, 3.81, 0), x_dir=(1, 0, 0), z_dir=(0, 1, 0))):
        with Locations((-85.725, 48.5775)):
            Rectangle(SKETCH50_W, SKETCH50_H)
        with Locations((-85.725, -48.5775)):
            Rectangle(SKETCH50_W, SKETCH50_H)
    extrude(amount=BOSS_EXTRUDE16_DEPTH)

    # Fillet1
    fillet1_edges = [part.edges().sort_by_distance(p)[0] for p in [
        (100.0125, 12.7, 85.725),
        (-100.0125, 12.7, 85.725),
        (-100.0125, 12.7, -85.725),
        (100.0125, 12.7, -85.725),
    ]]
    fillet(fillet1_edges, radius=FILLET1_R)

    # Fillet2
    fillet2_edges = [part.edges().sort_by_distance(p)[0] for p in [
        (-96.8375, 3.81, -60.0075),
        (0, 3.81, -69.85),
        (0, 3.81, 69.85),
        (-74.6125, 3.81, 0),
        (-77.7875, 3.81, 0),
        (-96.8375, 3.81, 0),
        (-87.3125, 3.81, -46.99),
        (-85.725, 3.81, -50.165),
        (-96.8375, 3.81, 60.0075),
        (-87.3125, 3.81, 46.99),
        (-85.725, 3.81, 50.165),
    ]]
    fillet(fillet2_edges, radius=FILLET2_R)

    # Fillet3
    fillet3_edges = [part.edges().sort_by_distance(p)[0] for p in [
        (-76.2, 10.16, 46.99),
        (-76.2, 10.16, -46.99),
    ]]
    fillet(fillet3_edges, radius=FILLET3_R - 0.0001)  # a hair under: the kernel refuses the full size


solid = part.part
